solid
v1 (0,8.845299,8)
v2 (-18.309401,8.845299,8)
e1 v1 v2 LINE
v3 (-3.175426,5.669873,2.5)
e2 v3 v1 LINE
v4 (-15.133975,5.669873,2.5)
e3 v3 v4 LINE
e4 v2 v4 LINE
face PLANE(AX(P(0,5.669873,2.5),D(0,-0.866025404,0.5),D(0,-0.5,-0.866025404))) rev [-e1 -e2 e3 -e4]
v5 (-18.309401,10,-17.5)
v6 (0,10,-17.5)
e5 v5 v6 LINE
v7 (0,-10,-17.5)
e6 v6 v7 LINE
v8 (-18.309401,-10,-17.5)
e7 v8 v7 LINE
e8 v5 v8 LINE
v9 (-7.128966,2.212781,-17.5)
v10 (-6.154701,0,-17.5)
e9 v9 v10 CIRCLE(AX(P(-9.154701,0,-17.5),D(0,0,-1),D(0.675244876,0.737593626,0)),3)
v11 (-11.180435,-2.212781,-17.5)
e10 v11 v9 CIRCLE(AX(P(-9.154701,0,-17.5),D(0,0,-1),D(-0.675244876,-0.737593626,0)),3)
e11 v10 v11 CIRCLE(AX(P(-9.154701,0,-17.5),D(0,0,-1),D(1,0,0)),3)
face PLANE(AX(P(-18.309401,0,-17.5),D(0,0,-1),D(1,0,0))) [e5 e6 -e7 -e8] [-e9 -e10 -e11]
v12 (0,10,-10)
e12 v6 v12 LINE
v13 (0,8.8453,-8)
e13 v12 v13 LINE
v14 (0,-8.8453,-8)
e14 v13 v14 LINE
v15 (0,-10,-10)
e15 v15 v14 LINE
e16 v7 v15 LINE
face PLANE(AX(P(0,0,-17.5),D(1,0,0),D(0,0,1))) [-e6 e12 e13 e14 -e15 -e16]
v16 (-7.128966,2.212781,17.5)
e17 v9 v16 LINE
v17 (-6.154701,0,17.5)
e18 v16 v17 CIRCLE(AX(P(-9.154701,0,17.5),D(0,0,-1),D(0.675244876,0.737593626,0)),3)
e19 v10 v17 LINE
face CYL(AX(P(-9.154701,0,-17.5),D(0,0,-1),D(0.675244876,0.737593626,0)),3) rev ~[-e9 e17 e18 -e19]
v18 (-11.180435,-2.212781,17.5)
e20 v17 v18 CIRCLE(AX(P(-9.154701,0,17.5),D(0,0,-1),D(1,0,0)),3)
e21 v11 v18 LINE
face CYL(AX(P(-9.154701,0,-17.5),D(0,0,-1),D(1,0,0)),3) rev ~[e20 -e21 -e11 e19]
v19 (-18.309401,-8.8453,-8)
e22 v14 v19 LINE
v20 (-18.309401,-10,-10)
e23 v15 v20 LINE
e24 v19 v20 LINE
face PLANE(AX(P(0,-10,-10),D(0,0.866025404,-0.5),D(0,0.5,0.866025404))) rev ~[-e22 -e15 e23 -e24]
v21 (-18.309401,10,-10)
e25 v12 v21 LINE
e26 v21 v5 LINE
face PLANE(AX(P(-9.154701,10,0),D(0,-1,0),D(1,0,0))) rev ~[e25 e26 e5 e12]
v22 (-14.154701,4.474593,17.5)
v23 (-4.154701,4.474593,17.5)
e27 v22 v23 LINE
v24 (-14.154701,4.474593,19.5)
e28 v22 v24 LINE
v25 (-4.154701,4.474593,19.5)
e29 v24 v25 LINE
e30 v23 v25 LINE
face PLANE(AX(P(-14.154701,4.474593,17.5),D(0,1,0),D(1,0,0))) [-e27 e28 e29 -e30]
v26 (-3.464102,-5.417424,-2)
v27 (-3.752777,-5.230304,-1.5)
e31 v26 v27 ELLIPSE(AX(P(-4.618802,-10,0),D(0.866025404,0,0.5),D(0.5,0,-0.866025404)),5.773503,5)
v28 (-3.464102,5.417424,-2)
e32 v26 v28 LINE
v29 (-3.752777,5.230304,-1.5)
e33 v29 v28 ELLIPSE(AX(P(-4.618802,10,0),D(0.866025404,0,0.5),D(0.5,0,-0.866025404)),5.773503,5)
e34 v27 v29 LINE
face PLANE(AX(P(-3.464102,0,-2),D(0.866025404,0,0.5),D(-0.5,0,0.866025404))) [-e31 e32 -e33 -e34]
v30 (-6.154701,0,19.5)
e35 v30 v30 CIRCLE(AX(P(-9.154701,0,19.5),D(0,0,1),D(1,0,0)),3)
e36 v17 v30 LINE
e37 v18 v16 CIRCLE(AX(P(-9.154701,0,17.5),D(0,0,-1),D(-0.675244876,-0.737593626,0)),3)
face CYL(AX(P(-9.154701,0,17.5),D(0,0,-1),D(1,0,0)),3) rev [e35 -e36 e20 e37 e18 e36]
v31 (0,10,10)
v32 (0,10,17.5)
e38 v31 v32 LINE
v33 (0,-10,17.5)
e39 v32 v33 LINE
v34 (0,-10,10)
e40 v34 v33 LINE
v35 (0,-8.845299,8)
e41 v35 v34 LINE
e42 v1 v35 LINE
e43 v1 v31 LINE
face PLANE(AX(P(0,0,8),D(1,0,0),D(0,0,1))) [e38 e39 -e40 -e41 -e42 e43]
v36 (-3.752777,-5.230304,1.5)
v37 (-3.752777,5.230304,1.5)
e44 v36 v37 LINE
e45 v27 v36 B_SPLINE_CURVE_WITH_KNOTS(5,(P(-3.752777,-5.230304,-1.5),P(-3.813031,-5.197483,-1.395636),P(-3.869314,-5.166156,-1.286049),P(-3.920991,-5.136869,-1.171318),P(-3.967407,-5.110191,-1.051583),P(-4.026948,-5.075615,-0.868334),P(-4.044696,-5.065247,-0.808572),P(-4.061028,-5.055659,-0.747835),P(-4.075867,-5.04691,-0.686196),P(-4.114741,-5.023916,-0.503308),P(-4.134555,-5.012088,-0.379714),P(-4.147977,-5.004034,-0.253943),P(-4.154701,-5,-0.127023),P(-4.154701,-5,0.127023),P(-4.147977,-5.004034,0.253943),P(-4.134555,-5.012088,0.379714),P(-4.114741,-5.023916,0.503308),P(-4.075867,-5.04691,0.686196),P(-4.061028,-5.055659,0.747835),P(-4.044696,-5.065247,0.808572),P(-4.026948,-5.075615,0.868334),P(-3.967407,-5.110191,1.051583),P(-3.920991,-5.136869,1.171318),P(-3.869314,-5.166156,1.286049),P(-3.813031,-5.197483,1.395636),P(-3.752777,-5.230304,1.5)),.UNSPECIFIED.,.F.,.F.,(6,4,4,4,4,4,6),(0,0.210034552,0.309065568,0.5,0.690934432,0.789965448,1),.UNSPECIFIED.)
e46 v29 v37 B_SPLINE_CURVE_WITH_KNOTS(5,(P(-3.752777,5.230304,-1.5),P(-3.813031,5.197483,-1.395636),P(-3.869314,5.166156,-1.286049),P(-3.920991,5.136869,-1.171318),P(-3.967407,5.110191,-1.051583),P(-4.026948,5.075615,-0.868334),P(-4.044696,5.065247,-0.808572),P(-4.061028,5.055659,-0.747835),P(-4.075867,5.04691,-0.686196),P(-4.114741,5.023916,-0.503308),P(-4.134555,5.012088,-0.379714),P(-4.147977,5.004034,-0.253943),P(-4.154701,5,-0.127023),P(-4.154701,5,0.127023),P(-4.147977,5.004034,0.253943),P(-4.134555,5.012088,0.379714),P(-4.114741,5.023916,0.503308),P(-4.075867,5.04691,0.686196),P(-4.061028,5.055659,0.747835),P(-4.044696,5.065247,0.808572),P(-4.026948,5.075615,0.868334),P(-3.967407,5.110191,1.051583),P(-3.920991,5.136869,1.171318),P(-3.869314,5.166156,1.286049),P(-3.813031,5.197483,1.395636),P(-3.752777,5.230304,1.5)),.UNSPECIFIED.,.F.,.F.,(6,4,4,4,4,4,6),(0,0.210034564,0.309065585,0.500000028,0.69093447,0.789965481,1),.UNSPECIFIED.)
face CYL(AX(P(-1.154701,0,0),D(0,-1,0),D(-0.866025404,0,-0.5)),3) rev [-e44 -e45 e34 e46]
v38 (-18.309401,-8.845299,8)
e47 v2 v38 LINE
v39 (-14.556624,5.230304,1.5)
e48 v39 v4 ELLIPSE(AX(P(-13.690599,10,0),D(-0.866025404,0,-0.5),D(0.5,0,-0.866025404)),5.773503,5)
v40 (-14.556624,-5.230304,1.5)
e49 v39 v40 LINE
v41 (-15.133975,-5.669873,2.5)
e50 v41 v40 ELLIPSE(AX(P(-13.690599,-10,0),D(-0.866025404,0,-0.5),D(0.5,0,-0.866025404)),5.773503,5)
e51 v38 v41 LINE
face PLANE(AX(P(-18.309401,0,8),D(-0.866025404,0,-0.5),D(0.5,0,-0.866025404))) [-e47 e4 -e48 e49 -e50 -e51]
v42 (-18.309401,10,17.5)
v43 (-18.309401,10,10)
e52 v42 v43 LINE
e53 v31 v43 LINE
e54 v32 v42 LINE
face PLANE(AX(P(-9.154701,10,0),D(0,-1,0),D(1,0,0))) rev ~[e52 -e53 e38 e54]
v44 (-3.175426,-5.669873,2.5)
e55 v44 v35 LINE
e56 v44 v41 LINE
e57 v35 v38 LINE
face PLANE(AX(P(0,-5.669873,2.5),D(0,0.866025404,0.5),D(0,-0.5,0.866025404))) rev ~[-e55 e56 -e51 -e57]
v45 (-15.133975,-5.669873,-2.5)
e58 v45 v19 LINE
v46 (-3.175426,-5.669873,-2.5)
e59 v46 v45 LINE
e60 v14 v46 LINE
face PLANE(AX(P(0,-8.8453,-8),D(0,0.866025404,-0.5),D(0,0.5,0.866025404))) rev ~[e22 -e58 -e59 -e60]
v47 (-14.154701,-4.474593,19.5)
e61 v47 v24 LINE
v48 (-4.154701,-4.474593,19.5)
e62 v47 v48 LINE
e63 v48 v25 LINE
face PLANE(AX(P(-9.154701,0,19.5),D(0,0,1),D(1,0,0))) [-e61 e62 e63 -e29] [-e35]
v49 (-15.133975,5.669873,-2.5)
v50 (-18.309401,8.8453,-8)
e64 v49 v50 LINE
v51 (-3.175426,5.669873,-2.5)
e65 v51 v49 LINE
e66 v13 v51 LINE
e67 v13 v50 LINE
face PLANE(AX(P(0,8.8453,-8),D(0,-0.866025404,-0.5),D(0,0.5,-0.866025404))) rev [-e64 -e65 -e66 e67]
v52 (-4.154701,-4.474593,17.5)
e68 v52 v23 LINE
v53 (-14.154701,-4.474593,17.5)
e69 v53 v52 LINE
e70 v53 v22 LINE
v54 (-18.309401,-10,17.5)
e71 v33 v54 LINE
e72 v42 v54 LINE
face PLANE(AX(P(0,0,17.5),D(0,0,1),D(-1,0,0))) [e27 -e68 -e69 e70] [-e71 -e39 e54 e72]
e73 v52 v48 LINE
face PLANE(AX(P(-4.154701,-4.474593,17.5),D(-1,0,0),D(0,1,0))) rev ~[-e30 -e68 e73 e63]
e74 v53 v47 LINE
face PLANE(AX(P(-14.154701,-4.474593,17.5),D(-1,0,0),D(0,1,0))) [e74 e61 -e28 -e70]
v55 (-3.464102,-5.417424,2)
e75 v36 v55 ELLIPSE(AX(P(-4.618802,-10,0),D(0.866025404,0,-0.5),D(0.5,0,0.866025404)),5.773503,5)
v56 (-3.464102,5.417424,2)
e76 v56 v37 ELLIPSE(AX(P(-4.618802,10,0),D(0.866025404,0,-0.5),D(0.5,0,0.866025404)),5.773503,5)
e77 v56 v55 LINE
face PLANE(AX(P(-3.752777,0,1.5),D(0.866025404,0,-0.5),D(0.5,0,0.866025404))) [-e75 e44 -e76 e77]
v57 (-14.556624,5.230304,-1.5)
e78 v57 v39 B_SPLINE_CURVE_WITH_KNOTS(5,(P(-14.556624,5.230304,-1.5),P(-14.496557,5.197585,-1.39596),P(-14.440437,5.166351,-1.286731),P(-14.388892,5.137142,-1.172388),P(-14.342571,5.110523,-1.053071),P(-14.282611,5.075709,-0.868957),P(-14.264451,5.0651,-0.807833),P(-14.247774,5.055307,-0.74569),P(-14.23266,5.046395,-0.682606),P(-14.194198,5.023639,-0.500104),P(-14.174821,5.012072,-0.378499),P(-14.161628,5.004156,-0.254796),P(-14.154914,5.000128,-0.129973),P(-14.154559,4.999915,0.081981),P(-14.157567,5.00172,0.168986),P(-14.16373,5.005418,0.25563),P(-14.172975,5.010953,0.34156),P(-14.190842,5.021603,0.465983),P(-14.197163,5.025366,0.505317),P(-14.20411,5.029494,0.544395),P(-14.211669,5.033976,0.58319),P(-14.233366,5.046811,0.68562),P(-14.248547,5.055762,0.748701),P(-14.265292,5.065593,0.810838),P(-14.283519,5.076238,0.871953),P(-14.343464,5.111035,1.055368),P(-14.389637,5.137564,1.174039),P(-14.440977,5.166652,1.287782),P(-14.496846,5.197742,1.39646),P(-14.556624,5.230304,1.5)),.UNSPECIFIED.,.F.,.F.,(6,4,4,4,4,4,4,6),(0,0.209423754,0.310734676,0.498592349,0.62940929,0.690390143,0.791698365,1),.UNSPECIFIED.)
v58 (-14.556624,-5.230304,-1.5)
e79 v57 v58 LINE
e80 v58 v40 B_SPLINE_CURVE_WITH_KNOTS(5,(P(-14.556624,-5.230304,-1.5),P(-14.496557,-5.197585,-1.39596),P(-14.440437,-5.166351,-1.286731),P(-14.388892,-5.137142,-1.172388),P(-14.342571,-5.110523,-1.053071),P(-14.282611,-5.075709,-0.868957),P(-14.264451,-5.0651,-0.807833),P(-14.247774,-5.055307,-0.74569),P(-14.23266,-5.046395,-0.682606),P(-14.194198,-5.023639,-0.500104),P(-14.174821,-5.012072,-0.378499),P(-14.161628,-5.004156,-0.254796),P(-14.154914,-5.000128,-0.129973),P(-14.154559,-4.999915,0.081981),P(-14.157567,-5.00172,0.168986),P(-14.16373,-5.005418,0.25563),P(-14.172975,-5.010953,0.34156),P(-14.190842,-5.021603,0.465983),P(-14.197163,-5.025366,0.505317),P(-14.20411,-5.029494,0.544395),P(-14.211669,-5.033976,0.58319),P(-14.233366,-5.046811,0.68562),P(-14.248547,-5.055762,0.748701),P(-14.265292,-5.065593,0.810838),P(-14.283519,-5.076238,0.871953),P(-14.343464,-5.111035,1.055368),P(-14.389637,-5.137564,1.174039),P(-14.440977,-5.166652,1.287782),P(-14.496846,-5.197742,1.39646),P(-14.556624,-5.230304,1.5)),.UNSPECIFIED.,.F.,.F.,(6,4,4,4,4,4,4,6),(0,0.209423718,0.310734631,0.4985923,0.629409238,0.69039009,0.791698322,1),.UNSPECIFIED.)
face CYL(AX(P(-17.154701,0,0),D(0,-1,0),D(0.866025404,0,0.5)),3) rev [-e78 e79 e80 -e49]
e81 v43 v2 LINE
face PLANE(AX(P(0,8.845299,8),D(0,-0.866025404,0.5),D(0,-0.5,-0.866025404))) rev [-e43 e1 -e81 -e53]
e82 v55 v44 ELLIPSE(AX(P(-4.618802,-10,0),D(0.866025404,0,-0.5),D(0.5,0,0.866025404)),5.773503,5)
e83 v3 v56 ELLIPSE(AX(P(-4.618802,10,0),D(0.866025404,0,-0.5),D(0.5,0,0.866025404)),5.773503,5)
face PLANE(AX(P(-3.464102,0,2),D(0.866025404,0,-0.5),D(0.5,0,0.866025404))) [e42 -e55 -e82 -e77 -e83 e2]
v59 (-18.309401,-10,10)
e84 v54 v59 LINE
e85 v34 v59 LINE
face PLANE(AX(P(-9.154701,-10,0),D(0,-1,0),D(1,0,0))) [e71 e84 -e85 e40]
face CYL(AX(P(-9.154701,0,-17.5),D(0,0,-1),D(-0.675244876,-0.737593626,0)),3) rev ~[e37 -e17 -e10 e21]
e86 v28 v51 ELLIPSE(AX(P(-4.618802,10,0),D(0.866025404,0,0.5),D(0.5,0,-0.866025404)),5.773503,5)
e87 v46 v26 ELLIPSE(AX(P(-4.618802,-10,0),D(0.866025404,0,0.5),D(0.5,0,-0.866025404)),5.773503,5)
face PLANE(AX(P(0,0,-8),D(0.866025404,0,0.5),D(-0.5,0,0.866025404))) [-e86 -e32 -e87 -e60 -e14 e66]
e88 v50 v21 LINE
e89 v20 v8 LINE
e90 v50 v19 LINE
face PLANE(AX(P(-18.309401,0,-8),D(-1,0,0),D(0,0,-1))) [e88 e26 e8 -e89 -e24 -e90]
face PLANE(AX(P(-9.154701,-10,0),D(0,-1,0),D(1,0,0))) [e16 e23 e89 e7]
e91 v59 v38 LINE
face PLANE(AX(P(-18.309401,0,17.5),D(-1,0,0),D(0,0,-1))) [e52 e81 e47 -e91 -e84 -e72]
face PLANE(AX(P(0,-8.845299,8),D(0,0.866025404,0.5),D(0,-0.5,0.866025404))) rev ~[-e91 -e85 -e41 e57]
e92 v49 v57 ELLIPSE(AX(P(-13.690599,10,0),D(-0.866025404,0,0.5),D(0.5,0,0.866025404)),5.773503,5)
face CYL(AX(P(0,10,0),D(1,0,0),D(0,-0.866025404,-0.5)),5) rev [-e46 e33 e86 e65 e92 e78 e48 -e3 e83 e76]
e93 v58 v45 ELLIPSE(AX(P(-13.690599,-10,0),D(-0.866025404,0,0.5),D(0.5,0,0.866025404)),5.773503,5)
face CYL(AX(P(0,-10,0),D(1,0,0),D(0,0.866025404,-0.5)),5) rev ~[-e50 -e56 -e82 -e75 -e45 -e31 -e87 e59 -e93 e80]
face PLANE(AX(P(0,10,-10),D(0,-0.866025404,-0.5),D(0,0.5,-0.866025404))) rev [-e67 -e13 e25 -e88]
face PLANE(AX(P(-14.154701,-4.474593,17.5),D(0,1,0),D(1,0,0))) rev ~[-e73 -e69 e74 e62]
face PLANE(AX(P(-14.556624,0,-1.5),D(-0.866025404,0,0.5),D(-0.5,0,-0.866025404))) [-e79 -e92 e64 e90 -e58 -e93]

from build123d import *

# Parameters (mm, degrees)
F1_DEPTH = 10
F3_DEPTH = 18.3104010768
F5_DEPTH = 35.001
F6_W     = 10
F6_H     = 8.9491856137
F6_R     = 3
F7_DEPTH = 2


# Not quite as in the source:
# - a pattern or mirror of a feature is missing from the dataset's text; its kind, count and spacing are read off the source's solid


with BuildPart() as f1:
    # F0 (on Front) → F1 (new body, symmetric)
    with BuildSketch(Plane.XZ):
        with BuildLine():
            Line((-3.7527767497, 1.5), (-3.4641016043, 2.0000000188))
            Line((-3.4641016043, 2.0000000188), (0, 8))
            Line((0, 8), (0, 17.5))
            Line((0, 17.5), (-18.3094010768, 17.5))
            Line((-18.3094010768, 17.5), (-18.3094010768, 8))
            Line((-18.3094010768, 8), (-14.556624327, 1.5))
            ThreePointArc((-14.556624327, 1.5), (-14.1547005384, 0), (-14.556624327, -1.5))
            Line((-14.556624327, -1.5), (-18.3094010768, -8))
            Line((-18.3094010768, -8), (-18.3094010768, -17.5))
            Line((-18.3094010768, -17.5), (0, -17.5))
            Line((0, -17.5), (0, -8))
            Line((0, -8), (-3.4641016187, -1.9999999939))
            Line((-3.4641016187, -1.9999999939), (-3.7527767497, -1.5))
            ThreePointArc((-3.7527767497, -1.5), (-4.1547005384, 0), (-3.7527767497, 1.5))
        make_face()
    extrude(amount=F1_DEPTH, both=True)

    # F2 (on Right) → F3 (cut, through all)
    with BuildSketch(Plane.YZ):
        with BuildLine():
            ThreePointArc((-6.7017059222, 0), (-7.2468927023, 4.1411047244), (-8.8452994645, 8.0000000049))
            Line((-8.8452994645, 8), (-10, 8))
            Line((-10, 8), (-10, 1.5))
            Line((-10, 1.5), (-10, -8))
            Line((-10, -8), (-10, -9.7296796796))
            ThreePointArc((-10, -9.7296796796), (-9.3945168749, -8.8836208643), (-8.8452995254, -8.0000001104))
            ThreePointArc((-8.8452995254, -8.0000001104), (-7.246892718, -4.1411047832), (-6.7017059222, 0))
        make_face()
        with BuildLine():
            ThreePointArc((-8.8452994645, 8.0000000049), (-9.3945168411, 8.8836208136), (-10, 9.7296796796))
            Line((-10, 9.7296796796), (-10, 8))
            Line((-10, 8), (-8.8452994645, 8))
        make_face()
        with BuildLine():
            Line((-5.6698729811, 2.5), (-8.8452994645, 8.0000000049))
            ThreePointArc((-8.8452994645, 8.0000000049), (-7.2468927023, 4.1411047244), (-6.7017059222, 0))
            ThreePointArc((-6.7017059222, 0), (-7.246892718, -4.1411047832), (-8.8452995254, -8.0000001104))
            Line((-8.8452995254, -8.0000001104), (-5.6698729811, -2.5))
            ThreePointArc((-5.6698729811, -2.5), (-5, 0), (-5.6698729811, 2.5))
        make_face()
        with BuildLine():
            Line((-8.8452994645, 8.0000000049), (-10, 10))
            Line((-10, 10), (-10, 9.7296796796))
            ThreePointArc((-10, 9.7296796796), (-9.3945168411, 8.8836208136), (-8.8452994645, 8.0000000049))
        make_face()
        with BuildLine():
            ThreePointArc((-8.8452995254, -8.0000001104), (-9.3945168749, -8.8836208643), (-10, -9.7296796796))
            Line((-10, -9.7296796796), (-10, -10))
            Line((-10, -10), (-8.8452995254, -8.0000001104))
        make_face()
    f3 = extrude(amount=-F3_DEPTH, mode=Mode.SUBTRACT)

    # F3_copies: F3 across plane
    add(f3.mirror(Plane.ZX), mode=Mode.SUBTRACT)

    # F4 (on face) → F5 (cut, through all)
    with BuildSketch(Plane(origin=(0, 0, -17.5), x_dir=(1, 0, 0), z_dir=(0, 0, -1))):
        with BuildLine():
            Line((-11.1804351675, 2.2127808776), (-7.1289659092, -2.2127808776))
            ThreePointArc((-7.1289659092, -2.2127808776), (-6.4090490777, -1.2088829787), (-6.1547005384, 0))
            ThreePointArc((-6.1547005384, 0), (-7.9458175596, 2.7456514607), (-11.1804351675, 2.2127808776))
        make_face()
        with BuildLine():
            ThreePointArc((-11.1804351675, 2.2127808776), (-11.367481416, -2.0257346291), (-7.1289659092, -2.2127808776))
            Line((-7.1289659092, -2.2127808776), (-11.1804351675, 2.2127808776))
        make_face()
    extrude(amount=-F5_DEPTH, mode=Mode.SUBTRACT)

    # F6 (on face) → F7 (join)
    with BuildSketch(Plane.XY.offset(17.5)):
        with Locations((-9.1547005384, 0)):
            Rectangle(F6_W, F6_H)
        with Locations((-9.1547005384, 0)):
            Circle(F6_R, mode=Mode.SUBTRACT)
    extrude(amount=F7_DEPTH)


solid = f1.part
